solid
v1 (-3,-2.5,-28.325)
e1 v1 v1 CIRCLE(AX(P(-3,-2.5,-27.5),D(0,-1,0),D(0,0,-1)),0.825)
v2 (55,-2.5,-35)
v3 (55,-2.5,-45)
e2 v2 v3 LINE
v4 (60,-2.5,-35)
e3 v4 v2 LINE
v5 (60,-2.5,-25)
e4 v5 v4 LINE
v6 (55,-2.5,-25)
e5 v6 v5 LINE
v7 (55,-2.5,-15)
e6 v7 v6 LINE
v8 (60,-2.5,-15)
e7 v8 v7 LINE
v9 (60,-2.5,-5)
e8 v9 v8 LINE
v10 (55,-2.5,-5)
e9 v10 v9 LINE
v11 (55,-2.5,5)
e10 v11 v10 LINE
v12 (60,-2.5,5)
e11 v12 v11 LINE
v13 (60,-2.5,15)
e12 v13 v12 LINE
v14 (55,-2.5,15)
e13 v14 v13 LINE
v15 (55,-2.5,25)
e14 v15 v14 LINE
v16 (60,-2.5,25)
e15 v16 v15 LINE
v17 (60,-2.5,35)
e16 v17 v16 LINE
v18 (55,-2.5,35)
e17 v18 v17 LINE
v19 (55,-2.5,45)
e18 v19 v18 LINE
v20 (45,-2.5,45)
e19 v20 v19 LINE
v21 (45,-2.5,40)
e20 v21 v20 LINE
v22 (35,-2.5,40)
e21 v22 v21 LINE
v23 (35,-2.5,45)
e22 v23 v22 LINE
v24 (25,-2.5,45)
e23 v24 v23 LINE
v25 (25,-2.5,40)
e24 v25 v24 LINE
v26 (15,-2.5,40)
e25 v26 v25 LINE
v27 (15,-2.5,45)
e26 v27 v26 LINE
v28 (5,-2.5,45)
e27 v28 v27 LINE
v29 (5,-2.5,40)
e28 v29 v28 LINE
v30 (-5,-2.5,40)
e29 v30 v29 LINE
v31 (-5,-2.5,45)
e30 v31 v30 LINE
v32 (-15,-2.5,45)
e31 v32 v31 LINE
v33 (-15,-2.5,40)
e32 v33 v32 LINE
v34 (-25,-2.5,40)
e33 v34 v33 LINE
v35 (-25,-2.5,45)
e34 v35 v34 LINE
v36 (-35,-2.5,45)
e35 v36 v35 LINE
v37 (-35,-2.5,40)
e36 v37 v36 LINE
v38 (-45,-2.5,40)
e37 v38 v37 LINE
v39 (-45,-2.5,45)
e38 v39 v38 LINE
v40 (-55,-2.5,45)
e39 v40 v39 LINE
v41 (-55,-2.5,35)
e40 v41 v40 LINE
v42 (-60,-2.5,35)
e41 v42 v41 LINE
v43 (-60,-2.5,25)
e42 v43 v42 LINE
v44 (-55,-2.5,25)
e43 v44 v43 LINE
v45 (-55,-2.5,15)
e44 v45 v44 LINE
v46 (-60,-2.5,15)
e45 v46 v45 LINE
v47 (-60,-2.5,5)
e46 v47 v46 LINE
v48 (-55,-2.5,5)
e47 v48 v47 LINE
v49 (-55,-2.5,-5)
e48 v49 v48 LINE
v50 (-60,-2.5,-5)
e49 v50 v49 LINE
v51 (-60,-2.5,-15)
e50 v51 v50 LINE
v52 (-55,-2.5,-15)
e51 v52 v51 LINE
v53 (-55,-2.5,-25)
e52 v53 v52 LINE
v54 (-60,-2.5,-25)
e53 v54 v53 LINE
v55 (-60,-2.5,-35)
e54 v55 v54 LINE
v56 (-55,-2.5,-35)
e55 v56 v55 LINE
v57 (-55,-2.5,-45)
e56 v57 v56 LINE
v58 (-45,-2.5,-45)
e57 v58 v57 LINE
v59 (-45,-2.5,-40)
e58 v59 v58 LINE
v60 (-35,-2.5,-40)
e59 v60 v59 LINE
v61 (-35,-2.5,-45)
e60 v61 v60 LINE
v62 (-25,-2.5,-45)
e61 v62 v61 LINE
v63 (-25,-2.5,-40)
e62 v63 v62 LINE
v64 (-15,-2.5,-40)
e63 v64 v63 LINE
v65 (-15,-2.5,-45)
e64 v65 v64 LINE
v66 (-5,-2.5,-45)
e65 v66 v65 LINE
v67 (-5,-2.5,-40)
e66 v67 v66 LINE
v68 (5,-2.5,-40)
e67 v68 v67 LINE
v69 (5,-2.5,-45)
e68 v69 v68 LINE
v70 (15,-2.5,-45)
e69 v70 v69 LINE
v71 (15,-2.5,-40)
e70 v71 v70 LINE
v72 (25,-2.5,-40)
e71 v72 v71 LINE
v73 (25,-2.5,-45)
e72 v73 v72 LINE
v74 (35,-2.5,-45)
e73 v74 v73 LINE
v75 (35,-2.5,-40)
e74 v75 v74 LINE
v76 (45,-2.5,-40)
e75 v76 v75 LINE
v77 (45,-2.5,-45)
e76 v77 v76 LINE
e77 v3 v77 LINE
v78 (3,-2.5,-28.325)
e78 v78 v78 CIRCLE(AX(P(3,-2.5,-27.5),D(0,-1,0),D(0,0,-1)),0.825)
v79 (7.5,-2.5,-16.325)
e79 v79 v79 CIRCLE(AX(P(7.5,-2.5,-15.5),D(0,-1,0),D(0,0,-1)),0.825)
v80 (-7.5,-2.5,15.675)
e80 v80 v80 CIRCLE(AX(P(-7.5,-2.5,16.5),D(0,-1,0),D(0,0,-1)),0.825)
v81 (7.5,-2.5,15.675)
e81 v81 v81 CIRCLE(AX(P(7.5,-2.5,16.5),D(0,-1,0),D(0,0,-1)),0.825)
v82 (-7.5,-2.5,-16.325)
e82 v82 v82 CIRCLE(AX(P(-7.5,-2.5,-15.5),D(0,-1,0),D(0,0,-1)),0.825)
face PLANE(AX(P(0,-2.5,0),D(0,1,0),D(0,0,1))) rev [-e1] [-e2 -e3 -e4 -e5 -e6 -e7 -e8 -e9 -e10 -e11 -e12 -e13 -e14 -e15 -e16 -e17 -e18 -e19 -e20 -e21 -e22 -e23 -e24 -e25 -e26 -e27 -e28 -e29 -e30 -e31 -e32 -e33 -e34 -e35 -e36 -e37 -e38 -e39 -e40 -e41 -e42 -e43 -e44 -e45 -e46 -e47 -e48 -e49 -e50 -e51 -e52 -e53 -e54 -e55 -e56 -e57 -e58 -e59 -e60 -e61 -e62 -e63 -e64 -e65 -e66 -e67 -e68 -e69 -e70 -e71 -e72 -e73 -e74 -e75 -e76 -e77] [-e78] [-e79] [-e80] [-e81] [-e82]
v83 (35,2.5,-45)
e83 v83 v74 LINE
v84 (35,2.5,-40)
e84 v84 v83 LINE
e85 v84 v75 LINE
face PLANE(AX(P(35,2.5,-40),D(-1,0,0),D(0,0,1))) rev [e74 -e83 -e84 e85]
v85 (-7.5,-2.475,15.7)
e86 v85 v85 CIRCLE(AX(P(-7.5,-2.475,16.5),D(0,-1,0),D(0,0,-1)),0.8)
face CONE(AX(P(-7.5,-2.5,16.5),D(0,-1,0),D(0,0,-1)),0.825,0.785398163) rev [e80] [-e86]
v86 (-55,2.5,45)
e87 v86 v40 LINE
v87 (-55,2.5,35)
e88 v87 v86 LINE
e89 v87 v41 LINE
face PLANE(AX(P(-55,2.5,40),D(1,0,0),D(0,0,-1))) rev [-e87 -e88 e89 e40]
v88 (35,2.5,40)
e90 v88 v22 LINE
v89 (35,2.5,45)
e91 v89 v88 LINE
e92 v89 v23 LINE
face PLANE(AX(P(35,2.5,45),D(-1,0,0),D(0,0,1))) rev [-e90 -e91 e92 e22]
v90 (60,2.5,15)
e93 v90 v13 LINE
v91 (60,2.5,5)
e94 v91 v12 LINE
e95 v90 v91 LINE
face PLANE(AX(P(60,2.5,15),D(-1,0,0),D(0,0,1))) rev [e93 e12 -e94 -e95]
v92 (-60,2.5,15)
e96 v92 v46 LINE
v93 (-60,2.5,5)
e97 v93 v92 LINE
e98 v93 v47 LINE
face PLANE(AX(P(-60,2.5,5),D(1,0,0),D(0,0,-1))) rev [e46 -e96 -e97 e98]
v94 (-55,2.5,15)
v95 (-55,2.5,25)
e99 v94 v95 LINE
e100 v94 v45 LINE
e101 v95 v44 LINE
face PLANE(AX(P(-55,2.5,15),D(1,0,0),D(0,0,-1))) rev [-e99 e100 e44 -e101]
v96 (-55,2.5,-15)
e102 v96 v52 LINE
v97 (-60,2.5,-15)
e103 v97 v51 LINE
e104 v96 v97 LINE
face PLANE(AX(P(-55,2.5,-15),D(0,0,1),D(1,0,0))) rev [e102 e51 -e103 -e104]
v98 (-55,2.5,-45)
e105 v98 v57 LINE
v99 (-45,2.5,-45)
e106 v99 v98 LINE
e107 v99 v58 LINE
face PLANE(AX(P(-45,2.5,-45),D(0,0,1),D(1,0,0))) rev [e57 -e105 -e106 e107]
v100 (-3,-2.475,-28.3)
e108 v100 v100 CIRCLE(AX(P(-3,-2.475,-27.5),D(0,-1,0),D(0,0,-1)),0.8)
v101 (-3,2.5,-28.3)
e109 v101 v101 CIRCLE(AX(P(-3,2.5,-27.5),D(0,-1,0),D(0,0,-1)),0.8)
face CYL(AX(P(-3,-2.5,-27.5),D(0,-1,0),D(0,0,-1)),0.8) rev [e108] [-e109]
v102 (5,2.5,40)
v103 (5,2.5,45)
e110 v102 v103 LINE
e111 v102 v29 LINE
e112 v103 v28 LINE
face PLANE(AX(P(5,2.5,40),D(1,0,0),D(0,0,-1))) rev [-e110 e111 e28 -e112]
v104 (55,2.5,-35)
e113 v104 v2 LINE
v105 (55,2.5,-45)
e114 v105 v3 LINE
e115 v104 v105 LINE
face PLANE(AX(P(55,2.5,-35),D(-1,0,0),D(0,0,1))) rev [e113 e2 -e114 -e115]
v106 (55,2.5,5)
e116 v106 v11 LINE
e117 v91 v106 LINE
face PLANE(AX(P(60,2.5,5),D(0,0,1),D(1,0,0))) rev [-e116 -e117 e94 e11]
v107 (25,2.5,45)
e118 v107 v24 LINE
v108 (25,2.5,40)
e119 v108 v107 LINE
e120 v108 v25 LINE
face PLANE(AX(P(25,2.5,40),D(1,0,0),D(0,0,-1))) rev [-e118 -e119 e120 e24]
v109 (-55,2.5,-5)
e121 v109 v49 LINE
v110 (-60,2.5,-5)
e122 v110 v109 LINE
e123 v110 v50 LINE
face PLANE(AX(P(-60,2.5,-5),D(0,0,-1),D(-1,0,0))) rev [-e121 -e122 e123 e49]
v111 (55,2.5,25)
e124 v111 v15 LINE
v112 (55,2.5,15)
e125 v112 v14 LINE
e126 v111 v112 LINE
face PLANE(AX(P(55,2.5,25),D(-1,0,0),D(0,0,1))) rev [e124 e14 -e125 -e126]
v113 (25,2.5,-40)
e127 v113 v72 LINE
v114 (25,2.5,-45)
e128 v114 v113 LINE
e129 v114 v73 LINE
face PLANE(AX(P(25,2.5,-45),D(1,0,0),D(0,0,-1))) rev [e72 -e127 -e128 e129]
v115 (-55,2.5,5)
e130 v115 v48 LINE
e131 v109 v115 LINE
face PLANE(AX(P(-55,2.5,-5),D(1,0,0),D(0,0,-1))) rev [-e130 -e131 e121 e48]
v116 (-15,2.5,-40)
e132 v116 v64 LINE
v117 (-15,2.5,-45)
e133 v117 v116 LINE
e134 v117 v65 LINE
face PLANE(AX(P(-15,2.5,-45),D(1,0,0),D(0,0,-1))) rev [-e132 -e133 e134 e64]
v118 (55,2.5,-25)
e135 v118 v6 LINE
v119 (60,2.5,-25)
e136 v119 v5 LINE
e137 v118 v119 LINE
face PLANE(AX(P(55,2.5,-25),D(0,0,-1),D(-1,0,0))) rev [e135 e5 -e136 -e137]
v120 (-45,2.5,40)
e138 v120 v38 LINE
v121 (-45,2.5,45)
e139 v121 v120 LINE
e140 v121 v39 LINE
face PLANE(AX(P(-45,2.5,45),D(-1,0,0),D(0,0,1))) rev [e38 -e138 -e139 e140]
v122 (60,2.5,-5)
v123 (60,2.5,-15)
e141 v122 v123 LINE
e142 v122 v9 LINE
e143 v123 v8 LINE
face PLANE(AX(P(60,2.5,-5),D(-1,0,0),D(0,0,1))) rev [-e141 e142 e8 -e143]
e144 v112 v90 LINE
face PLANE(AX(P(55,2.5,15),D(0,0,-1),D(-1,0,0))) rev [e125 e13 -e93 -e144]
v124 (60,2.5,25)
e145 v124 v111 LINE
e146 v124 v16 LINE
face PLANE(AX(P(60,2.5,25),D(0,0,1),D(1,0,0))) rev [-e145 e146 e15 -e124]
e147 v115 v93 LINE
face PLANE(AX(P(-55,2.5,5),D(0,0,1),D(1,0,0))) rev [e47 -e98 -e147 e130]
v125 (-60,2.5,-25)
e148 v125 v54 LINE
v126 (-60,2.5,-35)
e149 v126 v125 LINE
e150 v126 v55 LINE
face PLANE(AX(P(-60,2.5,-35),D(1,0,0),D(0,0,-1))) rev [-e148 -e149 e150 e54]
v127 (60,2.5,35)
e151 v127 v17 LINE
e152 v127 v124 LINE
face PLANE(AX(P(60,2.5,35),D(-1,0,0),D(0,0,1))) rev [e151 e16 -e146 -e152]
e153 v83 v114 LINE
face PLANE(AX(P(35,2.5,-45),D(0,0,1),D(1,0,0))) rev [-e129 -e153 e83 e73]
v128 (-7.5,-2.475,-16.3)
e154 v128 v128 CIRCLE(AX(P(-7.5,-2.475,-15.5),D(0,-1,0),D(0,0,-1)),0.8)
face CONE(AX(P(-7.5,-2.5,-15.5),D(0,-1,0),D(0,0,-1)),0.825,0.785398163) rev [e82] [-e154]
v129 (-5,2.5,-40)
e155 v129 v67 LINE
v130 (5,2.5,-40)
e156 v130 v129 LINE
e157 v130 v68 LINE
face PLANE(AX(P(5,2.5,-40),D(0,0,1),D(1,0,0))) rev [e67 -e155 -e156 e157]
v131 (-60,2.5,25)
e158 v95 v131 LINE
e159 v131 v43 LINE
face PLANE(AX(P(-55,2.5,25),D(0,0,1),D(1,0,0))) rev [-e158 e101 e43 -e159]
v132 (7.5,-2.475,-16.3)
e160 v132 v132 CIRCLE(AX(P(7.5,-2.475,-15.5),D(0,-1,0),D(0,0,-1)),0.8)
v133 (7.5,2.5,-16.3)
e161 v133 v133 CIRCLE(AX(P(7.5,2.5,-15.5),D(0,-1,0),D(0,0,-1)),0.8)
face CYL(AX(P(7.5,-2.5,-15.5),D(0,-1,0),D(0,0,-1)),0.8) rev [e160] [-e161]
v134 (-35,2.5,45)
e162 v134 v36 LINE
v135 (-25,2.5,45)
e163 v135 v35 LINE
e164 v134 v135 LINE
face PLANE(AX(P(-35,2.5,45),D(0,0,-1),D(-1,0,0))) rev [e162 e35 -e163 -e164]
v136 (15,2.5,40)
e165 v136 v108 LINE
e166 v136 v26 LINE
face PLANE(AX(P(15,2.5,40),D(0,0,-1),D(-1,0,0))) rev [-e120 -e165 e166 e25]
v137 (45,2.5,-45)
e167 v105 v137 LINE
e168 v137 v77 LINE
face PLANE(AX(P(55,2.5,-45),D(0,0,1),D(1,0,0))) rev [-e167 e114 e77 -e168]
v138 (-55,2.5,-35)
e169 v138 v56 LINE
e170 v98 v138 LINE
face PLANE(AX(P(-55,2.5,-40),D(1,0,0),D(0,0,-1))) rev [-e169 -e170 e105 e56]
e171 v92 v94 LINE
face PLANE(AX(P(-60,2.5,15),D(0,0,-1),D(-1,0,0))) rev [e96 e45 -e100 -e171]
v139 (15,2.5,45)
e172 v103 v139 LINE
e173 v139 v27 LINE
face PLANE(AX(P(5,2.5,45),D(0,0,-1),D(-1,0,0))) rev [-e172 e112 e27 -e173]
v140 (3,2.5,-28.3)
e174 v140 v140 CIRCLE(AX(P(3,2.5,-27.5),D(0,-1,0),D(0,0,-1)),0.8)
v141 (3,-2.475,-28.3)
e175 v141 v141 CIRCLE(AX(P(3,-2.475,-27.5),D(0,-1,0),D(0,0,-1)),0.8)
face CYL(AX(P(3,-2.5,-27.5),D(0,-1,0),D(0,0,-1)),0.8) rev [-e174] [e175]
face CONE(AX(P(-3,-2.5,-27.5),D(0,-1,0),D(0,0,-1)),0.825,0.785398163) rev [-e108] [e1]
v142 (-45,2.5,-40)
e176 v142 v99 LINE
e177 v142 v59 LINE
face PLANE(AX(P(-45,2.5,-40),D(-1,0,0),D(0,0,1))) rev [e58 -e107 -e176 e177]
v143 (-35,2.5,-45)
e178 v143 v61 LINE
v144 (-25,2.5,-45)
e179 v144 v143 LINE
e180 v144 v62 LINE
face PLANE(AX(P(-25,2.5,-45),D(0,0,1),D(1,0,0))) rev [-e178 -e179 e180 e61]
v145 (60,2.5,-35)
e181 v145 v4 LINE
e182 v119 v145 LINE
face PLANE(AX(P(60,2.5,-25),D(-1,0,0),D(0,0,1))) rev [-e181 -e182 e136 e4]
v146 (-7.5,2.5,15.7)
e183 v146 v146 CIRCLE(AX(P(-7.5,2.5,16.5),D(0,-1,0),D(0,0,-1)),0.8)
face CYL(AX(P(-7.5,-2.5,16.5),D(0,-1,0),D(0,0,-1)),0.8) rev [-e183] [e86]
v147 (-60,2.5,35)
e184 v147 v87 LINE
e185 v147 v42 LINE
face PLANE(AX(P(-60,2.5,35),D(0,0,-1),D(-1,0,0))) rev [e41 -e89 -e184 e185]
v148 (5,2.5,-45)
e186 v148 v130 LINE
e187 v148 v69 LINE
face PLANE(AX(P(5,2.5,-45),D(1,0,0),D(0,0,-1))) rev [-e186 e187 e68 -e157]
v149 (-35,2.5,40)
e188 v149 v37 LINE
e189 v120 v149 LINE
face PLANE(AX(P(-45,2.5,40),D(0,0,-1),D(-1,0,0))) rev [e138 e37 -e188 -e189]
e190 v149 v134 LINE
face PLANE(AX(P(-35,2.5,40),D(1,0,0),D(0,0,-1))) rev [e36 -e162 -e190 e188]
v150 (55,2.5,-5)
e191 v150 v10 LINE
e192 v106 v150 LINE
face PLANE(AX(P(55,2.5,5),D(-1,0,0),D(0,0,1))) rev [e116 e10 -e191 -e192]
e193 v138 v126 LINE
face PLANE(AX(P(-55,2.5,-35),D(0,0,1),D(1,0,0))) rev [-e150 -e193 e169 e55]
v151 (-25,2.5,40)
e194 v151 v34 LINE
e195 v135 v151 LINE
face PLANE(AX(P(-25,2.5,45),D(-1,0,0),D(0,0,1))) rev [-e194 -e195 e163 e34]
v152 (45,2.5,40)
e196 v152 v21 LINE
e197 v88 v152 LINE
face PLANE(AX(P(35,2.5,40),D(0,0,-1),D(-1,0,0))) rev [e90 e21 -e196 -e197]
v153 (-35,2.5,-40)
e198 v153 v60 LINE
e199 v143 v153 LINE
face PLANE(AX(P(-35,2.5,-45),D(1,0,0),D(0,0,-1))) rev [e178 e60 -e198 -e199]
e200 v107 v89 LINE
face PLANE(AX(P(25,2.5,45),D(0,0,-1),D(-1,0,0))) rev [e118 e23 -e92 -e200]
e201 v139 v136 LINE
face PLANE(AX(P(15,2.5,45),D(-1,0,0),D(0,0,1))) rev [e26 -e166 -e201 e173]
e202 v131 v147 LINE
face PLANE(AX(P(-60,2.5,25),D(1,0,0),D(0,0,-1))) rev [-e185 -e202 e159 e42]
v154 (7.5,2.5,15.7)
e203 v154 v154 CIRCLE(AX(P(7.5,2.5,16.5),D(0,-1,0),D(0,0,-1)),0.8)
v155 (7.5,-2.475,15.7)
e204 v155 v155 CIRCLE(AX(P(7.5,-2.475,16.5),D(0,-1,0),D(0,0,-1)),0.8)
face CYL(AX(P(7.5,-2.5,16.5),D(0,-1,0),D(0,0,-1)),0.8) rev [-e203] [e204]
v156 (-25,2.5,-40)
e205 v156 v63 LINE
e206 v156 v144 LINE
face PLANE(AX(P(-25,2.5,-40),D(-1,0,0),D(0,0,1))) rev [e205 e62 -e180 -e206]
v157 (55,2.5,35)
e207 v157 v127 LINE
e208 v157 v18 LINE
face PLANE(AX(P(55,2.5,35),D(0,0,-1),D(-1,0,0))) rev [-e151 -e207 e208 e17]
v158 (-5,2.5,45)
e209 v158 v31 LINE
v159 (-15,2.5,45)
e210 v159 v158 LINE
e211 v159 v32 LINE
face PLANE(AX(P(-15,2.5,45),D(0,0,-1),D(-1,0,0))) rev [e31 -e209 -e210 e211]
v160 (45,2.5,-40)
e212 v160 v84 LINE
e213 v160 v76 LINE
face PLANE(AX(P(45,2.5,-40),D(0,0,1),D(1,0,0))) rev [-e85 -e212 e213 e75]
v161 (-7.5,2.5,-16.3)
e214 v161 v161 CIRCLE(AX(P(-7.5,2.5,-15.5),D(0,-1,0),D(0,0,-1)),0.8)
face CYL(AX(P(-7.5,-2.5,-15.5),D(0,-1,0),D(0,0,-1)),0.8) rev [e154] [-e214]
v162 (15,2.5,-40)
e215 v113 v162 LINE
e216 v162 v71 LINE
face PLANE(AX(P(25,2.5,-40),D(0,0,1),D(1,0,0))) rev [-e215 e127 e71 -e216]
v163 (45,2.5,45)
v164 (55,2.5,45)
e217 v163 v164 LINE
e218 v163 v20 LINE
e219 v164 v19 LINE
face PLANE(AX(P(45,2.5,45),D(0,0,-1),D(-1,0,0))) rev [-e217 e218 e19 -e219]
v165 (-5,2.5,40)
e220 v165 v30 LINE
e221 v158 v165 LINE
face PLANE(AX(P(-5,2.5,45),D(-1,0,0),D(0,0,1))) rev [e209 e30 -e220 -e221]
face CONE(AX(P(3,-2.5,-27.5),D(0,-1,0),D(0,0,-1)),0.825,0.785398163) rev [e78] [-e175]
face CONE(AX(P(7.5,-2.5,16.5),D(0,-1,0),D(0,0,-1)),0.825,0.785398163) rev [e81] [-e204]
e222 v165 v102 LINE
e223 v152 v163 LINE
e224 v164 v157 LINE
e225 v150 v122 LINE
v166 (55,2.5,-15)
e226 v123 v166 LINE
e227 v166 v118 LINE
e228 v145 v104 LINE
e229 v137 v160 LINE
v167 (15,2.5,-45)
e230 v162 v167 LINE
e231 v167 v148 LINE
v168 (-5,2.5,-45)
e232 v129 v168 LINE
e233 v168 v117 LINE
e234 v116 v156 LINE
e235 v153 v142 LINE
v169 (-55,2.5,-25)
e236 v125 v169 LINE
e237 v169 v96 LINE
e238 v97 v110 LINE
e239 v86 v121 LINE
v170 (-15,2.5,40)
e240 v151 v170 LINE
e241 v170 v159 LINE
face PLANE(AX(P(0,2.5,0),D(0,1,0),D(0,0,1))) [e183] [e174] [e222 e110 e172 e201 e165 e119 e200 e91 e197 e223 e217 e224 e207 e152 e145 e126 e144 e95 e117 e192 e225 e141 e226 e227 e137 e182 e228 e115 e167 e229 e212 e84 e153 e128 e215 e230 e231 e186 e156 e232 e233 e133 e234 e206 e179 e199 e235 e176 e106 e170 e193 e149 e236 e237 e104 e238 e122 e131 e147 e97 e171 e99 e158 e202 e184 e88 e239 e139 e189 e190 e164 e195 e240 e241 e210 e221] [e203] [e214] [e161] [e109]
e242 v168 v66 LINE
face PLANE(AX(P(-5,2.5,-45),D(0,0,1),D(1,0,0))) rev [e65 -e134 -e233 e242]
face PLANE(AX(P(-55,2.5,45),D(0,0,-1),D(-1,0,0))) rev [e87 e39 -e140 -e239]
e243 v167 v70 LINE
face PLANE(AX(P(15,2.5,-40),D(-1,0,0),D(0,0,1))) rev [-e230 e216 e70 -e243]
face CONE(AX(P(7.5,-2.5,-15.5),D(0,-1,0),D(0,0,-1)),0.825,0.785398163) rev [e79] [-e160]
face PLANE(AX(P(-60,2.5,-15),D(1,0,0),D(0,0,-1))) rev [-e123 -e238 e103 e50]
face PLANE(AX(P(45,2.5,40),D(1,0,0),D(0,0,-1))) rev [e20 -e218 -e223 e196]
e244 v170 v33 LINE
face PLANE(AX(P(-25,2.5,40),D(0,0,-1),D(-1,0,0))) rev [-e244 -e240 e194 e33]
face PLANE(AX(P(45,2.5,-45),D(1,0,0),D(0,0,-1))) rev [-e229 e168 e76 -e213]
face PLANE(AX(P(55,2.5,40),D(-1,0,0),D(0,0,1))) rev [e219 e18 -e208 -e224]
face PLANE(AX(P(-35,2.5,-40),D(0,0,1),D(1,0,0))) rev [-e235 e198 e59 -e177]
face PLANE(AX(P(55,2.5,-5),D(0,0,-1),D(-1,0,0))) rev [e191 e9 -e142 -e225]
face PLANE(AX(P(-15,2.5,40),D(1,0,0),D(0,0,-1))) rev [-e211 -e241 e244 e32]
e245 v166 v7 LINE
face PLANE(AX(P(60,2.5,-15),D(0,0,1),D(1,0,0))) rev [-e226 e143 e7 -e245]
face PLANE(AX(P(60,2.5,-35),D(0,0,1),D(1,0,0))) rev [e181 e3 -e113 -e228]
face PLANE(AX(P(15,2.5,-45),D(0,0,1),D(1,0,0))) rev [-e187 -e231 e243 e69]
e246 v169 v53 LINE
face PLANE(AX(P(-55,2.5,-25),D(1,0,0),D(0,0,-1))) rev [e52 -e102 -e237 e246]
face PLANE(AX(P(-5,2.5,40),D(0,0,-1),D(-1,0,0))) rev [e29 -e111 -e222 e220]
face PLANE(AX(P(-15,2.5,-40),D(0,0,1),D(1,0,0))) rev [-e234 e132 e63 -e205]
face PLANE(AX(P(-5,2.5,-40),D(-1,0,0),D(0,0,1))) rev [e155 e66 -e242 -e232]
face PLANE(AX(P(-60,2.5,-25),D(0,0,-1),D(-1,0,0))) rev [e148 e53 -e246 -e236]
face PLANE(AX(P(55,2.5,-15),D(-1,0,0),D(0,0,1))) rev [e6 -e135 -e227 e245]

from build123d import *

# Parameters (mm, degrees)
BOSS_EXTRUDE1_DEPTH               = 2.5
TAP_DRILL_FOR_M2_TAP2_D           = 1.6
TAP_DRILL_FOR_M2_TAP2_CSINK_D     = 1.65
TAP_DRILL_FOR_M2_TAP2_CSINK_ANGLE = 90


# Read off the part's stored shape, not the designer's step: Tap Drill for M2 Tap1
with BuildPart() as part:
    # Sketch1 → Boss-Extrude1 (new, symmetric)
    with BuildSketch(Plane(origin=(0, 0, 0), x_dir=(1, 0, 0), z_dir=(0, 1, 0))):
        Polygon((55, 45), (45, 45), (45, 40), (35, 40), (35, 45), (25, 45), (25, 40), (15, 40), (15, 45), (5, 45), (5, 40), (-5, 40), (-5, 45), (-15, 45), (-15, 40), (-25, 40), (-25, 45), (-35, 45), (-35, 40), (-45, 40), (-45, 45), (-55, 45), (-55, 40), (-55, 35), (-60, 35), (-60, 25), (-55, 25), (-55, 15), (-60, 15), (-60, 5), (-55, 5), (-55, -5), (-60, -5), (-60, -15), (-55, -15), (-55, -25), (-60, -25), (-60, -35), (-55, -35), (-55, -40), (-55, -45), (-45, -45), (-45, -40), (-35, -40), (-35, -45), (-25, -45), (-25, -40), (-15, -40), (-15, -45), (-5, -45), (-5, -40), (5, -40), (5, -45), (15, -45), (15, -40), (25, -40), (25, -45), (35, -45), (35, -40), (45, -40), (45, -45), (55, -45), (55, -40), (55, -35), (60, -35), (60, -25), (55, -25), (55, -15), (60, -15), (60, -5), (55, -5), (55, 5), (60, 5), (60, 15), (55, 15), (55, 25), (60, 25), (60, 35), (55, 35), (55, 40), align=None)
    extrude(amount=BOSS_EXTRUDE1_DEPTH, both=True)

    # Tap Drill for M2 Tap1 outline → Tap Drill for M2 Tap1 (revolve, cut)
    with BuildSketch(Plane(origin=(3, 0, -27.5), x_dir=(1, 0, 0), z_dir=(0, 0, 1))):
        Polygon((0.8, -2.475), (0.8, 2.5), (0, 2.5), (0, -2.5), (0.825, -2.5), align=None)
    revolve(axis=Axis((3, 0, -27.5), (0, 1, 0)), mode=Mode.SUBTRACT)

    # Tap Drill for M2 Tap1 2 outline → Tap Drill for M2 Tap1 2 (revolve, cut)
    with BuildSketch(Plane(origin=(-3, 0, -27.5), x_dir=(1, 0, 0), z_dir=(0, 0, 1))):
        Polygon((0.8, -2.475), (0.8, 2.5), (0, 2.5), (0, -2.5), (0.825, -2.5), align=None)
    revolve(axis=Axis((-3, 0, -27.5), (0, 1, 0)), mode=Mode.SUBTRACT)

    # Tap Drill for M2 Tap2 (through all)
    with Locations(Plane(origin=(0, -2.5, 0), x_dir=(-1, 0, 0), z_dir=(0, -1, 0))):
        with Locations((-7.5, 15.5), (7.5, 15.5), (-7.5, -16.5), (7.5, -16.5)):
            CounterSinkHole(TAP_DRILL_FOR_M2_TAP2_D / 2, TAP_DRILL_FOR_M2_TAP2_CSINK_D / 2, counter_sink_angle=TAP_DRILL_FOR_M2_TAP2_CSINK_ANGLE)


solid = part.part
